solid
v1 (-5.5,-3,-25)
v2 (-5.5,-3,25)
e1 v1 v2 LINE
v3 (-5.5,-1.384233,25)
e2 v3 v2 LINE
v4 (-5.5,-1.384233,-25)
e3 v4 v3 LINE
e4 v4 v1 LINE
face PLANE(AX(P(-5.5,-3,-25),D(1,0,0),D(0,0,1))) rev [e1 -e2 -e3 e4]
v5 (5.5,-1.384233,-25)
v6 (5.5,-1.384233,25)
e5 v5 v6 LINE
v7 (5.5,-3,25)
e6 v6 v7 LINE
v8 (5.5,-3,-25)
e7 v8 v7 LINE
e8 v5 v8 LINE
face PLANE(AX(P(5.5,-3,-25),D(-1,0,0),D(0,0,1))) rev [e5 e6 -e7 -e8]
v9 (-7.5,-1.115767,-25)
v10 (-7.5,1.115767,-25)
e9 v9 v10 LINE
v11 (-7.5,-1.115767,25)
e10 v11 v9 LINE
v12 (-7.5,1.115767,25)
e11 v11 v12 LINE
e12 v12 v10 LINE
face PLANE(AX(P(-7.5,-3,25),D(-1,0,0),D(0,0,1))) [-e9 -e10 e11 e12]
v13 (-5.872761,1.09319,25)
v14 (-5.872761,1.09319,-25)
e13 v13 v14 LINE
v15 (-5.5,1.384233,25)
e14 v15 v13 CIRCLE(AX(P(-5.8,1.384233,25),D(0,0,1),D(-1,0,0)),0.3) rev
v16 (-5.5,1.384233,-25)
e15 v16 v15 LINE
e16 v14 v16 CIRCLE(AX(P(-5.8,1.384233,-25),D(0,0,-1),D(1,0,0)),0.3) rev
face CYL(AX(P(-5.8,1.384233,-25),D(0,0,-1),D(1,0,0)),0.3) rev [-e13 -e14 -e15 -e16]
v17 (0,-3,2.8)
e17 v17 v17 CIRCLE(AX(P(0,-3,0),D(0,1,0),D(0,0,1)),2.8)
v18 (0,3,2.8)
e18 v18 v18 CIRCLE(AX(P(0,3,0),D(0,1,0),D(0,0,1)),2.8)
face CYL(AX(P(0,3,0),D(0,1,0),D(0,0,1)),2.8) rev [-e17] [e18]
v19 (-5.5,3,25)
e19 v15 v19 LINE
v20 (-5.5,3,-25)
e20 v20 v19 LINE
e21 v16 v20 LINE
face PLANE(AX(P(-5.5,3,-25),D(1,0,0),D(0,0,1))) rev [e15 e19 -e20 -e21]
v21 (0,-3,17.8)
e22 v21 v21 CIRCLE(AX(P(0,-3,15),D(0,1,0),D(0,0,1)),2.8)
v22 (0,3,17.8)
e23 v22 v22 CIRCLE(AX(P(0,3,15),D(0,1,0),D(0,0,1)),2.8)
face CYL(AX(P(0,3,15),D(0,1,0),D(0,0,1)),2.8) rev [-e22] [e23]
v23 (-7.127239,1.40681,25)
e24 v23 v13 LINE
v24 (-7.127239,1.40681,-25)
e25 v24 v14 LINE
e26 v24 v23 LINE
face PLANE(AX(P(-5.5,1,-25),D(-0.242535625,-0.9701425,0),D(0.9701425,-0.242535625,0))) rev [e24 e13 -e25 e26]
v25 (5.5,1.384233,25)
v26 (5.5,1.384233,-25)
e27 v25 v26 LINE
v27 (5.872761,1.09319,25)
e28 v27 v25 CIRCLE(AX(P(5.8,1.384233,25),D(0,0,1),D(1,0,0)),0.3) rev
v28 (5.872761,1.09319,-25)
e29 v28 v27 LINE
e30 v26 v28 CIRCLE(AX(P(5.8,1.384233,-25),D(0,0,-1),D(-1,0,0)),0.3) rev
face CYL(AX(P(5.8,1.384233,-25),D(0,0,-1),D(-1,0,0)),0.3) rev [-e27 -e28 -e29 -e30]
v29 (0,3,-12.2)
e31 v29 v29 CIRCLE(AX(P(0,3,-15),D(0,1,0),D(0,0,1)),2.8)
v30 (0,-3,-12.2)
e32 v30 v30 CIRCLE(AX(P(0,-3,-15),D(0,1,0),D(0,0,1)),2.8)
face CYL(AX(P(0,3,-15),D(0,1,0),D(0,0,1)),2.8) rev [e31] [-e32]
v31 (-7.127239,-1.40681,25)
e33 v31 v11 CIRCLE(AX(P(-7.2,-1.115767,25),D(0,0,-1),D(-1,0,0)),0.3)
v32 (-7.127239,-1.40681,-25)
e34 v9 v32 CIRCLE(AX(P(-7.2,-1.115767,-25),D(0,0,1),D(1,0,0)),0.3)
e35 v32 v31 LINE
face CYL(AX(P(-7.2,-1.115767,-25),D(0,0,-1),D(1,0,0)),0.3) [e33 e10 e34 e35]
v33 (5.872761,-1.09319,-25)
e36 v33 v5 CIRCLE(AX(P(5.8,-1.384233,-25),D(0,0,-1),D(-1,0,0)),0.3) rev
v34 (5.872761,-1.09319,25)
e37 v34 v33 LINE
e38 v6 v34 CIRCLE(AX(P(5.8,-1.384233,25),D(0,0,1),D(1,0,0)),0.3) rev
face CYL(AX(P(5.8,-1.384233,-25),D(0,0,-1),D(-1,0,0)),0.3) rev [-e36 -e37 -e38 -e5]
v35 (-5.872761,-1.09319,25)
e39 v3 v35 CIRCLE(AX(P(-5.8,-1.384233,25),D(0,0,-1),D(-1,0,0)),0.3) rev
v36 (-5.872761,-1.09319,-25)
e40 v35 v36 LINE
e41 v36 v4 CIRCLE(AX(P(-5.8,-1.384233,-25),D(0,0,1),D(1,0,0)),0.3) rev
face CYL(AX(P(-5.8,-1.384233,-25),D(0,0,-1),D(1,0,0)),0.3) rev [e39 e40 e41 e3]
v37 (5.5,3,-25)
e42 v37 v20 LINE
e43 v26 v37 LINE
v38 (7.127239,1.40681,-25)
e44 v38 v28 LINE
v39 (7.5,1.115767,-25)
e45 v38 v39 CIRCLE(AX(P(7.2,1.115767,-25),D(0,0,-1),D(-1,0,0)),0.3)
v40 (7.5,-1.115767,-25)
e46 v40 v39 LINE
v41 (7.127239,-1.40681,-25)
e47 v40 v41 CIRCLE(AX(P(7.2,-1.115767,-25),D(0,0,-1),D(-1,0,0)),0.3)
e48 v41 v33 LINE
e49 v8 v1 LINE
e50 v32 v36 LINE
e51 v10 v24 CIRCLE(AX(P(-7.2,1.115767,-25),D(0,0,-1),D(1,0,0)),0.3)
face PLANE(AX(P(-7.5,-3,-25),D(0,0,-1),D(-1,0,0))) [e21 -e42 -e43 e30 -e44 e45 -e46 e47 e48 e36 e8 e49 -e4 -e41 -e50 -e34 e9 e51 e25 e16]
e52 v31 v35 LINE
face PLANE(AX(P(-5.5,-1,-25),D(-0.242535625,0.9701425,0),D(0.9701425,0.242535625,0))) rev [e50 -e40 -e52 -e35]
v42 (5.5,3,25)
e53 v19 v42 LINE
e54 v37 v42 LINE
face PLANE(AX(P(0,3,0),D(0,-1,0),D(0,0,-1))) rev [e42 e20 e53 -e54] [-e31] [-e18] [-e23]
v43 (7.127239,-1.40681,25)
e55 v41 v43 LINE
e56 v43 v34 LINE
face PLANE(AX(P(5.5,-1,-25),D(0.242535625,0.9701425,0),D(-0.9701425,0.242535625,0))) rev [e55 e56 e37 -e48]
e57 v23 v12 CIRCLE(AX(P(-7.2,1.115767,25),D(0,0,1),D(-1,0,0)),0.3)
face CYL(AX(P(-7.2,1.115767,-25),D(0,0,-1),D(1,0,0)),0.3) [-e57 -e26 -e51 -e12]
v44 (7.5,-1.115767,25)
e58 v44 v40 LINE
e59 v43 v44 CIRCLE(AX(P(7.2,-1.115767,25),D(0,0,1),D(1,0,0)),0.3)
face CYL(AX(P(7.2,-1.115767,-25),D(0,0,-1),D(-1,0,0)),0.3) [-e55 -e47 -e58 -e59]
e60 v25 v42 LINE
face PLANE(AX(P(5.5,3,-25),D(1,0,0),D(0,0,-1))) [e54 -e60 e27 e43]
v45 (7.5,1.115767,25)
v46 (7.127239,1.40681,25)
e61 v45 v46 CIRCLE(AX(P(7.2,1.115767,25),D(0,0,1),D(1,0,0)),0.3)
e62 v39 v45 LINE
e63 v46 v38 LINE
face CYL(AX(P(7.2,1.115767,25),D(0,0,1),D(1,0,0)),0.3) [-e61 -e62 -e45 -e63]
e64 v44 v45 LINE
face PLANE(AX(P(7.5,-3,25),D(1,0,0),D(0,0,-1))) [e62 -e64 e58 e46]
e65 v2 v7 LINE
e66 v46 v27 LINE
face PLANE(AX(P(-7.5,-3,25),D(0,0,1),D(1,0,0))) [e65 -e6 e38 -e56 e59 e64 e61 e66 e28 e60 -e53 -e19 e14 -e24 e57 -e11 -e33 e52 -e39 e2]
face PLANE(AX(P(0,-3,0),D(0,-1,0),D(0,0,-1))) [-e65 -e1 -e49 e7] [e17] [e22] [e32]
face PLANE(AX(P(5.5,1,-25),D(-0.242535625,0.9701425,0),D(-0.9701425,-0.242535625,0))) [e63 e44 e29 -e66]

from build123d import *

# Parameters (mm, degrees)
SALIENTE_EXTRUIR1_DEPTH      = 3
SALIENTE_EXTRUIR1_DEPTH_BACK = 3
CROQUIS1_W                   = 15
CROQUIS1_H                   = 50
TALADRO1_D                   = 5.6
CORTAR_EXTRUIR2_DEPTH        = 27.272609311
REDONDEO1_R                  = 0.3
REDONDEO1_OF_SIMETR_A1_R     = 0.3
SIMETR_A2_START              = -25
SIMETR_A2_DEPTH              = 50


# Read off the part's stored shape, not the designer's step: Simetría2
with BuildPart() as part:
    # Croquis1 → Saliente-Extruir1 (new, two sides: drawn at the far end of the back side and taken through both)
    with BuildSketch(Plane(origin=(0, 0, 0), x_dir=(1, 0, 0), z_dir=(0, 1, 0)).offset(-SALIENTE_EXTRUIR1_DEPTH_BACK)):
        Rectangle(CROQUIS1_W, CROQUIS1_H)
    extrude(amount=SALIENTE_EXTRUIR1_DEPTH + SALIENTE_EXTRUIR1_DEPTH_BACK)

    # Taladro1 (through all)
    with Locations(Plane(origin=(0, 3, 0), x_dir=(1, 0, 0), z_dir=(0, 1, 0))):
        with Locations((0, 15), (0, -15), (0, 0)):
            Hole(TALADRO1_D / 2)

    # Croquis5 → Cortar-Extruir2 (cut, symmetric)
    with BuildSketch(Plane.XY):
        Polygon((5.5, -3), (5.5, -1), (7.5, -1.5), (7.5, -3), align=None)
    cortar_extruir2 = extrude(amount=CORTAR_EXTRUIR2_DEPTH, both=True, mode=Mode.SUBTRACT)

    # Redondeo1
    redondeo1_edges = [part.edges().sort_by_distance(p)[0] for p in [
        (5.5, -1, 0),
        (7.5, -1.5, 0),
    ]]
    fillet(redondeo1_edges, radius=REDONDEO1_R)

    # Simetría1: Cortar-Extruir2 across plane
    add(cortar_extruir2.mirror(Plane.ZX), mode=Mode.SUBTRACT)

    # Redondeo1 of Simetría1
    redondeo1_of_simetr_a1_edges = [part.edges().sort_by_distance(p)[0] for p in [
        (5.5, 1, 0),
        (7.5, 1.5, 0),
    ]]
    fillet(redondeo1_of_simetr_a1_edges, radius=REDONDEO1_OF_SIMETR_A1_R)

    # Simetría2 outline → Simetría2 (cut)
    with BuildSketch(Plane.XY.offset(SIMETR_A2_START)):
        with BuildLine():
            Line((-7.5, -3), (-5.5, -3))
            Line((-5.5, -3), (-5.5, -1.384232922))
            ThreePointArc((-5.5, -1.384232922), (-5.615376338, -1.147771291), (-5.872760688, -1.093190172))
            Line((-5.872760688, -1.093190172), (-7.127239312, -1.406809828))
            ThreePointArc((-7.127239312, -1.406809828), (-7.384623662, -1.352228709), (-7.5, -1.115767078))
            Line((-7.5, -1.115767078), (-7.5, -3))
        make_face()
        with BuildLine():
            Line((-7.5, 3), (-7.5, 1.115767078))
            ThreePointArc((-7.5, 1.115767078), (-7.384623662, 1.352228709), (-7.127239312, 1.406809828))
            Line((-7.127239312, 1.406809828), (-5.872760688, 1.093190172))
            ThreePointArc((-5.872760688, 1.093190172), (-5.615376338, 1.147771291), (-5.5, 1.384232922))
            Line((-5.5, 1.384232922), (-5.5, 3))
            Line((-5.5, 3), (-7.5, 3))
        make_face()
    extrude(amount=SIMETR_A2_DEPTH, mode=Mode.SUBTRACT)


solid = part.part
